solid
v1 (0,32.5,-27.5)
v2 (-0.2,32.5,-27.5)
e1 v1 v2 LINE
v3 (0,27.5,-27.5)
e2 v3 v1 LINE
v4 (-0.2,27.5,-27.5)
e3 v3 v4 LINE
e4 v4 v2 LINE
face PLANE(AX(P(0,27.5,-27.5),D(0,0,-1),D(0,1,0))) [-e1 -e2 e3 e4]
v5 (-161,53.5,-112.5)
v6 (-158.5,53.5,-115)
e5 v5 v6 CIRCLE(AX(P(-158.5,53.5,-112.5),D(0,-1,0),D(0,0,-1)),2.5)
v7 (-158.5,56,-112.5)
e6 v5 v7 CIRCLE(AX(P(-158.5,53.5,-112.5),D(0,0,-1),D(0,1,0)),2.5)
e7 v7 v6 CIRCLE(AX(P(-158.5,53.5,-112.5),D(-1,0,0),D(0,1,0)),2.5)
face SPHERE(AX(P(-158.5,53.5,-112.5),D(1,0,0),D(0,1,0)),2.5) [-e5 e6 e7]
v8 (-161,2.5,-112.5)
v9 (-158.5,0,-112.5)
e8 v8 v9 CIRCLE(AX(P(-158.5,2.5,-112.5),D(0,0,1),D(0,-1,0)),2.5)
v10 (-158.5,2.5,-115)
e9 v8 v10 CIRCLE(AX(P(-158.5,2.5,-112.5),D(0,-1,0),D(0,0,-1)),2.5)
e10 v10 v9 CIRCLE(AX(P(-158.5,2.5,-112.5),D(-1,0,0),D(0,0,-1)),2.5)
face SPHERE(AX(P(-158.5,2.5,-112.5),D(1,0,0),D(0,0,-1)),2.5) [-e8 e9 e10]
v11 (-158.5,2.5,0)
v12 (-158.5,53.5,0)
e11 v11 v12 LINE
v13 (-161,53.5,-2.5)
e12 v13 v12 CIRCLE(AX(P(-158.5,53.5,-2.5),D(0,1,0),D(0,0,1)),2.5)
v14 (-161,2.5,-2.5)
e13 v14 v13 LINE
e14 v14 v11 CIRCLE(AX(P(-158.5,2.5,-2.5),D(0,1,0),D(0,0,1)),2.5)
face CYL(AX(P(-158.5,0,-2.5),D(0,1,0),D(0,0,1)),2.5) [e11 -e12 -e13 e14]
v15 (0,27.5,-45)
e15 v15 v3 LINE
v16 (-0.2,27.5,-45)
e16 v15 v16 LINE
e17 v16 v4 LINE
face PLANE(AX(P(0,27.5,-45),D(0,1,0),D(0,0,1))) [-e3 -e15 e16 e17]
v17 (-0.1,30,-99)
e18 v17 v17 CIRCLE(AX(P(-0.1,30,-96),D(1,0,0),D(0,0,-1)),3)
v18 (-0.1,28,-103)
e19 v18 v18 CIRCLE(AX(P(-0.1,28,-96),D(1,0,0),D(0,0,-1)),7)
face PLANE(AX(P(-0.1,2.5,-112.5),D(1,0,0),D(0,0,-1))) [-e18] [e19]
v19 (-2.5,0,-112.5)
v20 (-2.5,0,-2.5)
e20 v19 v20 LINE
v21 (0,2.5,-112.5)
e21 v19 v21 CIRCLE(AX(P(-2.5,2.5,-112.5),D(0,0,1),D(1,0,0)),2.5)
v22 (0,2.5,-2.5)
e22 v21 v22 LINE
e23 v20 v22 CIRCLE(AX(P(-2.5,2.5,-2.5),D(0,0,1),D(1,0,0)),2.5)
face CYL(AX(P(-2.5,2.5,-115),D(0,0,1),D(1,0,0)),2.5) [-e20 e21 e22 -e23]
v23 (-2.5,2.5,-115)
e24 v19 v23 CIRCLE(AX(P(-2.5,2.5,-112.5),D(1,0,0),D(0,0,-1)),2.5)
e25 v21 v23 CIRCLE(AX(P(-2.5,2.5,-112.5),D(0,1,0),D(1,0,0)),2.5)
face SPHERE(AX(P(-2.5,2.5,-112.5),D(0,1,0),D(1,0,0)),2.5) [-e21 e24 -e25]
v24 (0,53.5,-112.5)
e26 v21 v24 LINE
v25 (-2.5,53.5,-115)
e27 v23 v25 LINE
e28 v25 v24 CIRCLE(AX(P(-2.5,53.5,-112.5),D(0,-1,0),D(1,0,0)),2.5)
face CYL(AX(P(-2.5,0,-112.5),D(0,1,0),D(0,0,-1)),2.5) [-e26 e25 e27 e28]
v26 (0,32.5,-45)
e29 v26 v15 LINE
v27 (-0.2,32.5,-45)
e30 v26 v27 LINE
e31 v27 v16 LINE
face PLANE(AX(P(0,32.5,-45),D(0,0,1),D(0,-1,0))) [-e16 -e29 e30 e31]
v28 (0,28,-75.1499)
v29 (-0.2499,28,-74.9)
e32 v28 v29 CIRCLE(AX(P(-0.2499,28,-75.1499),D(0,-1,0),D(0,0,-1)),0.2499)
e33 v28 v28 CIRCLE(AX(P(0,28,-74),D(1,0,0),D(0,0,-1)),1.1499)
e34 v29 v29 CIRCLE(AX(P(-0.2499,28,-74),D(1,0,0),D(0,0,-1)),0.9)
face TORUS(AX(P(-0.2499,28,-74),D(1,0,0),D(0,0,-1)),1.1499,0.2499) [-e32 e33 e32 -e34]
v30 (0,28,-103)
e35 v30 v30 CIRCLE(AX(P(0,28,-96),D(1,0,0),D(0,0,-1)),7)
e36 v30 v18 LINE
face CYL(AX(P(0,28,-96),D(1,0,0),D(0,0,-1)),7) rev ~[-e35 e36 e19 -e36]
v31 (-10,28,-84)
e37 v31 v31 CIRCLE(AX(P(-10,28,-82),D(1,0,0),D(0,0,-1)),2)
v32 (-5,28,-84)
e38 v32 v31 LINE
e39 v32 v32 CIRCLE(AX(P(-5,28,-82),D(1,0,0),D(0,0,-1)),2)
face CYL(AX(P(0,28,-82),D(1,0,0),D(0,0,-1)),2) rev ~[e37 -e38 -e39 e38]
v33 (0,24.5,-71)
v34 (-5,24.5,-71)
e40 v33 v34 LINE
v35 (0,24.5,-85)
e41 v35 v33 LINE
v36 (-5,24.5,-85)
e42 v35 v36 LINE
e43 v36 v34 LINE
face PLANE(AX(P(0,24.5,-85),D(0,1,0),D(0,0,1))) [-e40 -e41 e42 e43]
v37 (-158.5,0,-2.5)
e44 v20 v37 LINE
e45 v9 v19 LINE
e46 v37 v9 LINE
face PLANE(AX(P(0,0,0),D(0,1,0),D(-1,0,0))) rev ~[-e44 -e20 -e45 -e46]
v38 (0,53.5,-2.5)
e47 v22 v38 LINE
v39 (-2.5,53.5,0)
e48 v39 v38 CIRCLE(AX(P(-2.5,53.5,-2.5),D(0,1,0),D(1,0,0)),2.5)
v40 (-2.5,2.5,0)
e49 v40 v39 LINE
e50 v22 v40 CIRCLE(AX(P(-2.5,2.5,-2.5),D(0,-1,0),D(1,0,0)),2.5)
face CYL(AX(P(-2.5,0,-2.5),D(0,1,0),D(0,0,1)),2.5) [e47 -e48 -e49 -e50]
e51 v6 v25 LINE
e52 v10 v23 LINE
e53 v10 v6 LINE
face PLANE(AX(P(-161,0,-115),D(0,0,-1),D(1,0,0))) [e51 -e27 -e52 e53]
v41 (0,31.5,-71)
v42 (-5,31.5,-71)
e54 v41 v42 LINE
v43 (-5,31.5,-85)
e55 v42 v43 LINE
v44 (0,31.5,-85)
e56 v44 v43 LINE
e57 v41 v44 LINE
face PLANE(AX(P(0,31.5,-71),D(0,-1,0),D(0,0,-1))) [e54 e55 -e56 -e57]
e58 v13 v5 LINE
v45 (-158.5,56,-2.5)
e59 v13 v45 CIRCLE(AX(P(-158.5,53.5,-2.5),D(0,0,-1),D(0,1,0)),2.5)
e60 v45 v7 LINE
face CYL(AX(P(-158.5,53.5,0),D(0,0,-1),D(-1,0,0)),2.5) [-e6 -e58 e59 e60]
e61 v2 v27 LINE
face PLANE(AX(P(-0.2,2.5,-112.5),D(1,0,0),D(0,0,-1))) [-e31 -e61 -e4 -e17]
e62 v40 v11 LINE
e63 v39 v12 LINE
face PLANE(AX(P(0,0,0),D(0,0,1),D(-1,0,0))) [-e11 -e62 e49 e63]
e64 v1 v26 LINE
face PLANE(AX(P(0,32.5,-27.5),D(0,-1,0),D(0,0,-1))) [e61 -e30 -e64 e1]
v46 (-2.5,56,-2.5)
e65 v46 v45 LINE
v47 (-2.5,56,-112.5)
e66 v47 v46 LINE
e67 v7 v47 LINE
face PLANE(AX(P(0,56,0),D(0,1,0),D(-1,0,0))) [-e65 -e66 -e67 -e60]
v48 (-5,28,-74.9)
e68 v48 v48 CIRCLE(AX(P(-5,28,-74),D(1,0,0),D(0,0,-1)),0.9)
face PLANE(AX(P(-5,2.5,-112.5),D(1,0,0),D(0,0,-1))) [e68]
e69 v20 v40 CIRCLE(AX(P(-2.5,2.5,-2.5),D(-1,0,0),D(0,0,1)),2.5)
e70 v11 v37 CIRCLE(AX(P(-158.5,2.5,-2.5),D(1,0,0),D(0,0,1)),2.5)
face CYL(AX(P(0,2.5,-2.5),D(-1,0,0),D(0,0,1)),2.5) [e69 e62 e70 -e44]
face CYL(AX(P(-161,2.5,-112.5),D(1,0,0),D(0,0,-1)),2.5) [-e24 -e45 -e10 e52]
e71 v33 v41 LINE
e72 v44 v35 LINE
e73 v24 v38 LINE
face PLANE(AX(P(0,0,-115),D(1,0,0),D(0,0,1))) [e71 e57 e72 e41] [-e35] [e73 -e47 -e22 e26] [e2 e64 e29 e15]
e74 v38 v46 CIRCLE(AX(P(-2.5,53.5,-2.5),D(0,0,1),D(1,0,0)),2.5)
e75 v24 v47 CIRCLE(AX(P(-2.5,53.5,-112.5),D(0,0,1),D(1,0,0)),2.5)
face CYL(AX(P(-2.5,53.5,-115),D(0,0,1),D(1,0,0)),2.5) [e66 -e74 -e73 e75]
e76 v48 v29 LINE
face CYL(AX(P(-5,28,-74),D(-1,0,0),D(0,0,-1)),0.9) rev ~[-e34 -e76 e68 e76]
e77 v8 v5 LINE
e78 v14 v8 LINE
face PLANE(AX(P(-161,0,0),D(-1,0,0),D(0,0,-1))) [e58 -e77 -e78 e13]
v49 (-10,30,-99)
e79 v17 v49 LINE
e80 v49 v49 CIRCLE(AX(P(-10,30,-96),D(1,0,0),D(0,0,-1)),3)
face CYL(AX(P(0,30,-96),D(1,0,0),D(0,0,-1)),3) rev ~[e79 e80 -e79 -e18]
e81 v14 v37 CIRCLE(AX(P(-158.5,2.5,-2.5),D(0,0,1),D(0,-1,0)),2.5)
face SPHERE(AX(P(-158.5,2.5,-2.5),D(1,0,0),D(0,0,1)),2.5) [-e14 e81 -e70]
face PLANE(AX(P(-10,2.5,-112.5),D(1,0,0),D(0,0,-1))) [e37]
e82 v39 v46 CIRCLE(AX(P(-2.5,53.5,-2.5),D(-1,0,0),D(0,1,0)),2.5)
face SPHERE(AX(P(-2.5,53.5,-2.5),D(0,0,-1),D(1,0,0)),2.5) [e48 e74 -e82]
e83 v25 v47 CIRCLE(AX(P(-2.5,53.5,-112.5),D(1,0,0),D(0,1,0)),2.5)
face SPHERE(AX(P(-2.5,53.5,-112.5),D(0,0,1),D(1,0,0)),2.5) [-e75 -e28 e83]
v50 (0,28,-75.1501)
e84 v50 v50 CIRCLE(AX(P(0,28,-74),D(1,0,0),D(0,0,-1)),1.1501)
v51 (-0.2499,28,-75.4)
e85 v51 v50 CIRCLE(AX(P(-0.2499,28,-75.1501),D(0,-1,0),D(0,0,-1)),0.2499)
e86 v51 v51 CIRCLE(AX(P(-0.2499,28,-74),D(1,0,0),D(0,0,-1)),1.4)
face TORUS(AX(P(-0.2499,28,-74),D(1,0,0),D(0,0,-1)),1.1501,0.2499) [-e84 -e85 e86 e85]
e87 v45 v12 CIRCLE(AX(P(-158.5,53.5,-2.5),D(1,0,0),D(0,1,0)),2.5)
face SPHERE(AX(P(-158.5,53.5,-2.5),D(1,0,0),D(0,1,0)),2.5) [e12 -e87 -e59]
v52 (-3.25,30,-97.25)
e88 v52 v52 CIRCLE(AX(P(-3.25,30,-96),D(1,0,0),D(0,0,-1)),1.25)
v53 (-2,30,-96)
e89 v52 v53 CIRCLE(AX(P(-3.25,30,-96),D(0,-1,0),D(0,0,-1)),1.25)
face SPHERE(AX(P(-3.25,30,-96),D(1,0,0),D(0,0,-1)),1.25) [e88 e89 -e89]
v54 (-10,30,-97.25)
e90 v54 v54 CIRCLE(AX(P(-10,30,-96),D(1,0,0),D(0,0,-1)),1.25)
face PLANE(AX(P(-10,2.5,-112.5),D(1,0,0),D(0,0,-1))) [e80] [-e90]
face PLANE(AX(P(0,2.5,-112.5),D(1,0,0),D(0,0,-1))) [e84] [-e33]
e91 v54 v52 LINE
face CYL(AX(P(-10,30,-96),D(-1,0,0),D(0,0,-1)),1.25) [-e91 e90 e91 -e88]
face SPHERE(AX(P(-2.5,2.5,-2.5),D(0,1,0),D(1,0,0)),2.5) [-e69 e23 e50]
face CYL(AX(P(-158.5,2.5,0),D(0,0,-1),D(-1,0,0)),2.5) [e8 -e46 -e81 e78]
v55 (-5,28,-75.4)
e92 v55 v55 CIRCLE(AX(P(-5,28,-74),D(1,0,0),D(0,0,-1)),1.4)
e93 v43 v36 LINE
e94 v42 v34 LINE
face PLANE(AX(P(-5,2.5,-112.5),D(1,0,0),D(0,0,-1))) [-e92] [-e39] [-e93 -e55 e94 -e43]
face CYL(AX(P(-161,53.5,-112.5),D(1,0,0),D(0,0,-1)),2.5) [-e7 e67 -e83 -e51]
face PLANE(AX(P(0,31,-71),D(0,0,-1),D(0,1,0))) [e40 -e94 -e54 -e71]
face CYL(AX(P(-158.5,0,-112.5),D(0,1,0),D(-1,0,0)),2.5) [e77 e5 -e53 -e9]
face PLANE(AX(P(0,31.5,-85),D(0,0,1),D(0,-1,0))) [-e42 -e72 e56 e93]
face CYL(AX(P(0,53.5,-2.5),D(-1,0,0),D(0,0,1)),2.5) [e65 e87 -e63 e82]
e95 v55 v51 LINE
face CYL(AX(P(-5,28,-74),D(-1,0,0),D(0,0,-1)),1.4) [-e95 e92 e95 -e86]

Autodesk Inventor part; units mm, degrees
ref_plane "YZ Plane" through (0, 0, 0) normal (1, 0, 0) x (0, 1, 0)
ref_plane "XZ Plane" through (0, 0, 0) normal (0, 1, 0) x (-1, 0, 0)
ref_plane "XY Plane" through (0, 0, 0) normal (0, 0, 1) x (1, 0, 0)
sketch "Sketch1" plane through (0, 0, 0) normal (0, 1, 0) x (-1, 0, 0)
  line L0 (0, 0) -> (161, 0)
  line L1 (161, 0) -> (161, -115)
  line L2 (161, -115) -> (0, -115)
  line L3 (0, -115) -> (0, 0)
  dimension "d0" = 161
  dimension "d1" = 115
extrude "Extrusion1" add sketch "Sketch1" along normal blind 56
fillet "Fillet1" radius 2.5 12 edges at (0, 56, -57.5) (0, 28, -115) (0, 28, 0) (0, 0, -57.5) (-80.5, 0, 0) (-80.5, 0, -115) (-80.5, 56, -115) (-80.5, 56, 0) (-161, 56, -57.5) (-161, 28, 0) (-161, 28, -115) (-161, 0, -57.5)
sketch "Sketch2" plane through (0, 2.5, -112.5) normal (1, 0, 0) x (0, 0, -1)
  line L0 (2.5, 0) -> (2.5, 51) projected
  line L1 (0, 0) -> (-110, 0) projected
  line L2 (0, 51) -> (0, 0) projected
  line L3 (-110, 51) -> (0, 51) projected
  line L4 (-110, 0) -> (-110, 51) projected
  line L5 (0, 53.5) -> (-110, 53.5) projected
  line L6 (-41.5, 29) -> (-27.5, 29)
  line L7 (-27.5, 29) -> (-27.5, 22)
  line L8 (-27.5, 22) -> (-41.5, 22)
  line L9 (-41.5, 22) -> (-41.5, 29)
  line L10 (-85, 30) -> (-67.5, 30)
  line L11 (-67.5, 30) -> (-67.5, 25)
  line L12 (-67.5, 25) -> (-85, 25)
  line L13 (-85, 25) -> (-85, 30)
  circle A0 centre (-30.5, 25.5) radius 2
  line L14 (-41.5, 22.5) -> (-35.5, 22.5)
  line L15 (-35.5, 22.5) -> (-35.5, 28.5)
  line L16 (-35.5, 28.5) -> (-41.5, 28.5)
  line L17 (-41.5, 28.5) -> (-41.5, 22.5)
  line L18 (-41.5, 22.5) -> (-35.5, 28.5) construction
  line L19 (-35.5, 22.5) -> (-41.5, 28.5) construction
  circle A1 centre (-16.5, 25.5) radius 7
  circle A2 centre (-16.5, 27.5) radius 3
  point P0 (-112.5, -2.5)
  point P1 (-38.5, 25.5)
  point P2 (-41.5, 22.5)
  dimension "d5" = 26
  dimension "d6" = 19
  dimension "d7" = 14
  dimension "d8" = 7
  dimension "d9" = 30
  dimension "d10" = 17.5
  dimension "d11" = 5
  dimension "d12" = 70
  dimension "d13" = 23.5
  dimension "d14" = 24.5
  dimension "d15" = 4
  dimension "d16" = 33
  dimension "d17" = 41
  dimension "d18" = 6
  dimension "d19" = 6
  dimension "d20" = 14
  dimension "d21" = 19
  dimension "d22" = 6
  dimension "d44" = 28
  dimension "d45" = 28
  dimension "d46" = 28
extrude "Extrusion2" cut sketch "Sketch2" against normal blind 10 contours A2
extrude "Extrusion3" cut sketch "Sketch2" against normal blind 0.1 contours A1
extrude "Extrusion4" cut sketch "Sketch2" against normal blind 10 contours A0
extrude "Extrusion5" cut sketch "Sketch2" against normal blind 5 contours L6 L7 L8 L9 L14 L15 L16 | L16 L15 L14 L9 | A0
extrude "Extrusion7" cut sketch "Sketch2" against normal blind 0.2 contours L10 L11 L12 L13
sketch "Sketch3" plane through (-10, 30, -96) normal (1, 0, 0) x (0, 0, -1)
  circle A0 centre (0, 0) radius 1.25
  point P0 (-96, -30)
  dimension "d35" = 2.5
extrude "Extrusion8" add sketch "Sketch3" along normal blind 8
fillet "Fillet2" radius 1.25 1 edges at (-2, 30, -94.75)
sketch "Sketch4" plane through (-5, 2.5, -112.5) normal (1, 0, 0) x (0, 0, -1)
  circle A0 centre (-38.5, 25.5) radius 1.4
  circle A1 centre (-38.5, 25.5) radius 0.9
  point P0 (-112.5, -2.5)
  dimension "d39" = 2.8
  dimension "d40" = 1.8
extrude "Extrusion9" add sketch "Sketch4" along normal blind 5
fillet "Fillet3" radius 0.25 2 edges at (0, 28, -73.1) (0, 28, -72.6)
properties part number "22Ah BatteryPack"
